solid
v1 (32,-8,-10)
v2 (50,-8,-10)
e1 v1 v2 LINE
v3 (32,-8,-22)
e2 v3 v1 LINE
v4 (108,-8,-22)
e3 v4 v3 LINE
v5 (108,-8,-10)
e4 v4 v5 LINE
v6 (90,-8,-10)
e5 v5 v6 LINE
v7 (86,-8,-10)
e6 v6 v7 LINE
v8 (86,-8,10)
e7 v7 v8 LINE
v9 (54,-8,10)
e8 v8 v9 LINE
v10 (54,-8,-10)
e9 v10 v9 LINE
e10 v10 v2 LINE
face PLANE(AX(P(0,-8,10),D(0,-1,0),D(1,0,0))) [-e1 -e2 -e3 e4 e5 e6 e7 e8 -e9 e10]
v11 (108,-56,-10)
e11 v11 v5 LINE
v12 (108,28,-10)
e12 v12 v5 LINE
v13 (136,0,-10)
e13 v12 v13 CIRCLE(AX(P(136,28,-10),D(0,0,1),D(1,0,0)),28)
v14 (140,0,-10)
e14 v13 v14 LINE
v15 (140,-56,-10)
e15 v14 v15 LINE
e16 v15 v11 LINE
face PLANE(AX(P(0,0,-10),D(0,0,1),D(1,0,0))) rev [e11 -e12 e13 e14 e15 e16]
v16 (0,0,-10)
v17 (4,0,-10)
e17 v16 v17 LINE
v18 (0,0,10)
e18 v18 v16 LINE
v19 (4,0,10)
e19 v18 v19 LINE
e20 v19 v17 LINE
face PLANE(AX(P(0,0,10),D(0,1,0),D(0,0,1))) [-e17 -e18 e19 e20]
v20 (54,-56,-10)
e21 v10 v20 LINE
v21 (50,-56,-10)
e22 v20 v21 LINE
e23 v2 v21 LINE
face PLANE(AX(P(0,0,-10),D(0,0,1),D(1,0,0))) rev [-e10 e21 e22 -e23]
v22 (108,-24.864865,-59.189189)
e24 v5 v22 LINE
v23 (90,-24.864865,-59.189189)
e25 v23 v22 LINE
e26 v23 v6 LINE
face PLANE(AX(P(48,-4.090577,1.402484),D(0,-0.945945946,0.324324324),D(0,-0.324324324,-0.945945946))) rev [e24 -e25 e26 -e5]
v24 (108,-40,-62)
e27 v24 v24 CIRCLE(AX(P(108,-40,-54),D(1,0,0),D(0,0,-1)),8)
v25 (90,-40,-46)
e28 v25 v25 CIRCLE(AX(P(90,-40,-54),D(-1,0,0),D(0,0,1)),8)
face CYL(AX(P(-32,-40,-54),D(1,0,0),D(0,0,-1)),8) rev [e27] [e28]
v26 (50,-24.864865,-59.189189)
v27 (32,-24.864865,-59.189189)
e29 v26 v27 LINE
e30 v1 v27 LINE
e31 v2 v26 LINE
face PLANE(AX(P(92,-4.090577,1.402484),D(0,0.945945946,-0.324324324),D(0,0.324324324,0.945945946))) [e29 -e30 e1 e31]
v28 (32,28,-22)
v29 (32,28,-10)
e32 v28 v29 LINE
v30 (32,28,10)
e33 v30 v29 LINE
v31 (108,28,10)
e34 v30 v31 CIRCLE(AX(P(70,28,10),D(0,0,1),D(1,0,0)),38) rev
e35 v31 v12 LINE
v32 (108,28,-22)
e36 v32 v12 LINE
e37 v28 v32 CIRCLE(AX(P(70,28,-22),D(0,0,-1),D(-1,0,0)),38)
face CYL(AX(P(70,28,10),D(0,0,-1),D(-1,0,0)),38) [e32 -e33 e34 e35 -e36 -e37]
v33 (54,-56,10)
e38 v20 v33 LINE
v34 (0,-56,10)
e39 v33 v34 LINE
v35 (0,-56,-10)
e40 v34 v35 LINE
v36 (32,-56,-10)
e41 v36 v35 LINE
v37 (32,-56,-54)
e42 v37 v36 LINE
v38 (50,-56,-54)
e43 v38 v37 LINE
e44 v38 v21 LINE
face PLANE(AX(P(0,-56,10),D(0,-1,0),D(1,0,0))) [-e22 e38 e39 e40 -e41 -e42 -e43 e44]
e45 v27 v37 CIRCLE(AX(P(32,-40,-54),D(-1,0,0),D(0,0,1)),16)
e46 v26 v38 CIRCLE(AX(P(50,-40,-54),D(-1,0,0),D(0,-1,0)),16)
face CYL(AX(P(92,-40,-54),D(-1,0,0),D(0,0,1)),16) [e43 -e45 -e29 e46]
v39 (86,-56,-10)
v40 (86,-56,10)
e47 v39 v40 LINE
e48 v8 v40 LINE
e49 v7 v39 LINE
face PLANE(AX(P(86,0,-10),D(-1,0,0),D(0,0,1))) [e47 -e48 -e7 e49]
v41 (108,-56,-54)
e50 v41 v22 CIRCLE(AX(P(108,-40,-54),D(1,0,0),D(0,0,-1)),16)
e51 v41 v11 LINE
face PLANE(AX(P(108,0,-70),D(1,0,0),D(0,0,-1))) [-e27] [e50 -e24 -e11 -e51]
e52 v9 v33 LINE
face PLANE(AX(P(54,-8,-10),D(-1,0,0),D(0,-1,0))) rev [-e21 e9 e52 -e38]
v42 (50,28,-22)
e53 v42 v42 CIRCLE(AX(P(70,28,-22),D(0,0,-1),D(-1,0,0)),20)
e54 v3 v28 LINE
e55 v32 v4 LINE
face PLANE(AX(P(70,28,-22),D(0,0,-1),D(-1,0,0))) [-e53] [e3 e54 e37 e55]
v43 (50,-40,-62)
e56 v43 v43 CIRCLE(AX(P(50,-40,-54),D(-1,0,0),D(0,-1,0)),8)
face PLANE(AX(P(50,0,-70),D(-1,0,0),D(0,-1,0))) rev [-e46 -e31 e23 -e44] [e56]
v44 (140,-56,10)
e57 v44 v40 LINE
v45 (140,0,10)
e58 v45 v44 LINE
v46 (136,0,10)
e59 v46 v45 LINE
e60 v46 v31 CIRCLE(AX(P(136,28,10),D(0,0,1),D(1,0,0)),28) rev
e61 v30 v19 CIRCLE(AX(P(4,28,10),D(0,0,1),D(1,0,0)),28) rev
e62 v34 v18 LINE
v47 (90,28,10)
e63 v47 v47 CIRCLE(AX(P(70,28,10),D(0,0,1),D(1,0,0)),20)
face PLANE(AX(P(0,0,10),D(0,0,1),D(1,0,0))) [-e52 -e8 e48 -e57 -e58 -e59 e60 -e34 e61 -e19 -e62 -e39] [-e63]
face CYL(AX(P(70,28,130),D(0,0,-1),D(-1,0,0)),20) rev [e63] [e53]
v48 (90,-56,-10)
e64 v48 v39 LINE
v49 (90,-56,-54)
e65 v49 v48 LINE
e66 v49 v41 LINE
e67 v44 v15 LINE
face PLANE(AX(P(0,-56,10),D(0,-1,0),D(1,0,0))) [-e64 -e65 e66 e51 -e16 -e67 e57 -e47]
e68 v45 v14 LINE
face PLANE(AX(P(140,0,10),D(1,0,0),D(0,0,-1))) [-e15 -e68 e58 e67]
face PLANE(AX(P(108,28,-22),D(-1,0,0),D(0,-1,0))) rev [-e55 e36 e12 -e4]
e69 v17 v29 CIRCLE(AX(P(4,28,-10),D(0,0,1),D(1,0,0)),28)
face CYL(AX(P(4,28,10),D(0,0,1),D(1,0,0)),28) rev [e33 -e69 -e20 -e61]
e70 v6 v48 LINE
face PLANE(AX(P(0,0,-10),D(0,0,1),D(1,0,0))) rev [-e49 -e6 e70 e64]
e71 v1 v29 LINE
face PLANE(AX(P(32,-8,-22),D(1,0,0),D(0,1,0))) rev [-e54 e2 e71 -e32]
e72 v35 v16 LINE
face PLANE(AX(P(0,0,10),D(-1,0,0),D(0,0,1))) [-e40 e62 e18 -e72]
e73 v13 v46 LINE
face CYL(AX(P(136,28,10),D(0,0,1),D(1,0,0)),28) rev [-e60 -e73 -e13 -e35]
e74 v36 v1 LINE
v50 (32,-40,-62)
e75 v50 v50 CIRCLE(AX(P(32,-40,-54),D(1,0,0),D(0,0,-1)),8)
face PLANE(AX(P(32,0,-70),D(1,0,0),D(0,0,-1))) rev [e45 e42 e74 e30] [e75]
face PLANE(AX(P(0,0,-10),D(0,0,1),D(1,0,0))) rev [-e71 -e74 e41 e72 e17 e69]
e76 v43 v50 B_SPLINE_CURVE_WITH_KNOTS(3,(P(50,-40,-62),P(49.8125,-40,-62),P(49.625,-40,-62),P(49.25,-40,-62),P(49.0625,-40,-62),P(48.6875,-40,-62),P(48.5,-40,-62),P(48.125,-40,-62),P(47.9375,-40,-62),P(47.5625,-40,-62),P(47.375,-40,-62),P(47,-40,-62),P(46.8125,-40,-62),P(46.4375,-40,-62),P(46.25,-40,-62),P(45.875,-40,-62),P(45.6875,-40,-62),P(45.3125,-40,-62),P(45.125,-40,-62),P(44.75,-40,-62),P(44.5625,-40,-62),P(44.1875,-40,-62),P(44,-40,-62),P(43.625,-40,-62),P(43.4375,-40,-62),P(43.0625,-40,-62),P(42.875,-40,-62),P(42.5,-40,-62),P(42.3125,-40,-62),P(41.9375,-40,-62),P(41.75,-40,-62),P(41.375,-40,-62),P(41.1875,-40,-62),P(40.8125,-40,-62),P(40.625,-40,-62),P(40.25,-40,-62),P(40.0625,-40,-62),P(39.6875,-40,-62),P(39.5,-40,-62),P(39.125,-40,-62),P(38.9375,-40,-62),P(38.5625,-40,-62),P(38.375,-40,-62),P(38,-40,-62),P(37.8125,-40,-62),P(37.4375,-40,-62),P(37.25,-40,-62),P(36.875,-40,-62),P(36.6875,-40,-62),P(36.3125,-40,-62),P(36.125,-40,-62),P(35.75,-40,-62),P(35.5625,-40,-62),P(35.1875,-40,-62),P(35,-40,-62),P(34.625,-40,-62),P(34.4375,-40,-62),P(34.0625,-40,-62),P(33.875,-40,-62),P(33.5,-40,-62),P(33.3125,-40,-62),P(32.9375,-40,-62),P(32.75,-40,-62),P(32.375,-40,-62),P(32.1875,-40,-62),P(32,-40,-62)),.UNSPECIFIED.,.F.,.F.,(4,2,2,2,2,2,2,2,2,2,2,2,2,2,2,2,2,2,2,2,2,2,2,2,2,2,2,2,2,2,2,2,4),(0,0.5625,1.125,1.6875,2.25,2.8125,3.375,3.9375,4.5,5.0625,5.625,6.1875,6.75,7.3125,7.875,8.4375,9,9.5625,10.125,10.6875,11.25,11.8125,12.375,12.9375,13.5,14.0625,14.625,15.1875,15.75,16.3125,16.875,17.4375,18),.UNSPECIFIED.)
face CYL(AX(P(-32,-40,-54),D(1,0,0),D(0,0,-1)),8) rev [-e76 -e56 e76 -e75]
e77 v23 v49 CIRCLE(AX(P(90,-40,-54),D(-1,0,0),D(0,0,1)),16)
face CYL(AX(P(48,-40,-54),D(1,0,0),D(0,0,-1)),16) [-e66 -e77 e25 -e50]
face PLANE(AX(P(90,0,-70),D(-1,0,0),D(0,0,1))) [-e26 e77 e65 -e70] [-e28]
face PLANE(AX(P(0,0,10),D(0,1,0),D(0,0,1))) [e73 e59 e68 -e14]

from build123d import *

# Parameters (mm, degrees)
BOSS_EXTRUDE2_DEPTH = 10
FILLET3_R           = 28
SKETCH4_W           = 22
SKETCH4_H           = 48
BOSS_EXTRUDE4_DEPTH = 20
SKETCH9_W           = 18
SKETCH9_H           = 48
BOSS_EXTRUDE6_DEPTH = 60
CUT_EXTRUDE2_DEPTH  = 60
SKETCH12_W          = 18
SKETCH12_H          = 48
BOSS_EXTRUDE7_DEPTH = 60
CUT_EXTRUDE3_START  = -60
CUT_EXTRUDE3_DEPTH  = 60
SKETCH14_R          = 8
CUT_EXTRUDE4_DEPTH  = 140
SKETCH15_R          = 20
CUT_EXTRUDE5_DEPTH  = 140
SKETCH18_R          = 20
BOSS_EXTRUDE9_DEPTH = 12


with BuildPart() as part:
    # Sketch2 → Boss-Extrude2 (new, symmetric)
    with BuildSketch(Plane.XY):
        with BuildLine():
            Line((32, 0), (0, 0))
            Line((0, 0), (0, -56))
            Line((0, -56), (32, -56))
            Line((32, -56), (32, -8))
            Line((32, -8), (89.338383838, -8))
            Line((89.338383838, -8), (108, -8))
            Line((108, -8), (108, -56))
            Line((108, -56), (140, -56))
            Line((140, -56), (140, 0))
            Line((140, 0), (108, 0))
            Line((108, 0), (108, 28))
            ThreePointArc((108, 28), (70, 66), (32, 28))
            Line((32, 28), (32, 0))
        make_face()
    extrude(amount=BOSS_EXTRUDE2_DEPTH, both=True)

    # Fillet3
    fillet3_edges = [part.edges().sort_by_distance(p)[0] for p in [
        (32, 0, 0),
        (108, 0, 0),
    ]]
    fillet(fillet3_edges, radius=FILLET3_R - 0.0001)  # a hair under: the kernel refuses the full size

    # Sketch4 → Boss-Extrude4 (add, through all)
    with BuildSketch(Plane.XY.offset(10)):
        with Locations((97, -32)):
            Rectangle(SKETCH4_W, SKETCH4_H)
        with Locations((43, -32)):
            Rectangle(SKETCH4_W, SKETCH4_H)
    extrude(amount=-BOSS_EXTRUDE4_DEPTH)

    # Sketch9 → Boss-Extrude6 (add)
    with BuildSketch(Plane(origin=(0, 0, -10), x_dir=(-1, 0, 0), z_dir=(0, 0, -1))):
        with Locations((-99, -32)):
            Rectangle(SKETCH9_W, SKETCH9_H)
    extrude(amount=BOSS_EXTRUDE6_DEPTH)

    # Sketch10 → Cut-Extrude2 (cut)
    with BuildSketch(Plane(origin=(108, 0, 0), x_dir=(0, 0, -1), z_dir=(1, 0, 0))):
        with BuildLine():
            Line((70, -8), (10, -8))
            Line((10, -8), (59.189189189, -24.864864865))
            ThreePointArc((59.189189189, -24.864864865), (67.019735539, -30.7001889), (70, -40))
            Line((70, -40), (70, -8))
        make_face()
        with BuildLine():
            Line((70, -56), (70, -40))
            ThreePointArc((70, -40), (65.313708499, -51.313708499), (54, -56))
            Line((54, -56), (70, -56))
        make_face()
    extrude(amount=-CUT_EXTRUDE2_DEPTH, mode=Mode.SUBTRACT)

    # Sketch12 → Boss-Extrude7 (add)
    with BuildSketch(Plane(origin=(0, 0, -10), x_dir=(-1, 0, 0), z_dir=(0, 0, -1))):
        with Locations((-41, -32)):
            Rectangle(SKETCH12_W, SKETCH12_H)
    extrude(amount=BOSS_EXTRUDE7_DEPTH)

    # Sketch13 → Cut-Extrude3 (cut)
    with BuildSketch(Plane.ZY.offset(-32).offset(CUT_EXTRUDE3_START)):
        with BuildLine():
            Line((-70, -8), (-70, -40))
            ThreePointArc((-70, -40), (-67.019735539, -30.7001889), (-59.189189189, -24.864864865))
            Line((-59.189189189, -24.864864865), (-10, -8))
            Line((-10, -8), (-70, -8))
        make_face()
        with BuildLine():
            Line((-70, -40), (-70, -56))
            Line((-70, -56), (-54, -56))
            ThreePointArc((-54, -56), (-65.313708499, -51.313708499), (-70, -40))
        make_face()
    extrude(amount=CUT_EXTRUDE3_DEPTH, mode=Mode.SUBTRACT)

    # Sketch14 → Cut-Extrude4 (cut)
    with BuildSketch(Plane(origin=(108, 0, 0), x_dir=(0, 0, -1), z_dir=(1, 0, 0))):
        with Locations((54, -40)):
            Circle(SKETCH14_R)
    extrude(amount=-CUT_EXTRUDE4_DEPTH, mode=Mode.SUBTRACT)

    # Sketch15 → Cut-Extrude5 (cut)
    with BuildSketch(Plane(origin=(0, 0, -10), x_dir=(-1, 0, 0), z_dir=(0, 0, -1))):
        with Locations((-70, 28)):
            Circle(SKETCH15_R)
    extrude(amount=-CUT_EXTRUDE5_DEPTH, mode=Mode.SUBTRACT)

    # Sketch18 → Boss-Extrude9 (add)
    with BuildSketch(Plane(origin=(0, 0, -10), x_dir=(-1, 0, 0), z_dir=(0, 0, -1))):
        with BuildLine():
            Line((-108, 28), (-108, -8))
            Line((-108, -8), (-32, -8))
            Line((-32, -8), (-32, 28))
            ThreePointArc((-32, 28), (-70, 66), (-108, 28))
        make_face()
        with Locations((-70, 28)):
            Circle(SKETCH18_R, mode=Mode.SUBTRACT)
    extrude(amount=BOSS_EXTRUDE9_DEPTH)


solid = part.part
